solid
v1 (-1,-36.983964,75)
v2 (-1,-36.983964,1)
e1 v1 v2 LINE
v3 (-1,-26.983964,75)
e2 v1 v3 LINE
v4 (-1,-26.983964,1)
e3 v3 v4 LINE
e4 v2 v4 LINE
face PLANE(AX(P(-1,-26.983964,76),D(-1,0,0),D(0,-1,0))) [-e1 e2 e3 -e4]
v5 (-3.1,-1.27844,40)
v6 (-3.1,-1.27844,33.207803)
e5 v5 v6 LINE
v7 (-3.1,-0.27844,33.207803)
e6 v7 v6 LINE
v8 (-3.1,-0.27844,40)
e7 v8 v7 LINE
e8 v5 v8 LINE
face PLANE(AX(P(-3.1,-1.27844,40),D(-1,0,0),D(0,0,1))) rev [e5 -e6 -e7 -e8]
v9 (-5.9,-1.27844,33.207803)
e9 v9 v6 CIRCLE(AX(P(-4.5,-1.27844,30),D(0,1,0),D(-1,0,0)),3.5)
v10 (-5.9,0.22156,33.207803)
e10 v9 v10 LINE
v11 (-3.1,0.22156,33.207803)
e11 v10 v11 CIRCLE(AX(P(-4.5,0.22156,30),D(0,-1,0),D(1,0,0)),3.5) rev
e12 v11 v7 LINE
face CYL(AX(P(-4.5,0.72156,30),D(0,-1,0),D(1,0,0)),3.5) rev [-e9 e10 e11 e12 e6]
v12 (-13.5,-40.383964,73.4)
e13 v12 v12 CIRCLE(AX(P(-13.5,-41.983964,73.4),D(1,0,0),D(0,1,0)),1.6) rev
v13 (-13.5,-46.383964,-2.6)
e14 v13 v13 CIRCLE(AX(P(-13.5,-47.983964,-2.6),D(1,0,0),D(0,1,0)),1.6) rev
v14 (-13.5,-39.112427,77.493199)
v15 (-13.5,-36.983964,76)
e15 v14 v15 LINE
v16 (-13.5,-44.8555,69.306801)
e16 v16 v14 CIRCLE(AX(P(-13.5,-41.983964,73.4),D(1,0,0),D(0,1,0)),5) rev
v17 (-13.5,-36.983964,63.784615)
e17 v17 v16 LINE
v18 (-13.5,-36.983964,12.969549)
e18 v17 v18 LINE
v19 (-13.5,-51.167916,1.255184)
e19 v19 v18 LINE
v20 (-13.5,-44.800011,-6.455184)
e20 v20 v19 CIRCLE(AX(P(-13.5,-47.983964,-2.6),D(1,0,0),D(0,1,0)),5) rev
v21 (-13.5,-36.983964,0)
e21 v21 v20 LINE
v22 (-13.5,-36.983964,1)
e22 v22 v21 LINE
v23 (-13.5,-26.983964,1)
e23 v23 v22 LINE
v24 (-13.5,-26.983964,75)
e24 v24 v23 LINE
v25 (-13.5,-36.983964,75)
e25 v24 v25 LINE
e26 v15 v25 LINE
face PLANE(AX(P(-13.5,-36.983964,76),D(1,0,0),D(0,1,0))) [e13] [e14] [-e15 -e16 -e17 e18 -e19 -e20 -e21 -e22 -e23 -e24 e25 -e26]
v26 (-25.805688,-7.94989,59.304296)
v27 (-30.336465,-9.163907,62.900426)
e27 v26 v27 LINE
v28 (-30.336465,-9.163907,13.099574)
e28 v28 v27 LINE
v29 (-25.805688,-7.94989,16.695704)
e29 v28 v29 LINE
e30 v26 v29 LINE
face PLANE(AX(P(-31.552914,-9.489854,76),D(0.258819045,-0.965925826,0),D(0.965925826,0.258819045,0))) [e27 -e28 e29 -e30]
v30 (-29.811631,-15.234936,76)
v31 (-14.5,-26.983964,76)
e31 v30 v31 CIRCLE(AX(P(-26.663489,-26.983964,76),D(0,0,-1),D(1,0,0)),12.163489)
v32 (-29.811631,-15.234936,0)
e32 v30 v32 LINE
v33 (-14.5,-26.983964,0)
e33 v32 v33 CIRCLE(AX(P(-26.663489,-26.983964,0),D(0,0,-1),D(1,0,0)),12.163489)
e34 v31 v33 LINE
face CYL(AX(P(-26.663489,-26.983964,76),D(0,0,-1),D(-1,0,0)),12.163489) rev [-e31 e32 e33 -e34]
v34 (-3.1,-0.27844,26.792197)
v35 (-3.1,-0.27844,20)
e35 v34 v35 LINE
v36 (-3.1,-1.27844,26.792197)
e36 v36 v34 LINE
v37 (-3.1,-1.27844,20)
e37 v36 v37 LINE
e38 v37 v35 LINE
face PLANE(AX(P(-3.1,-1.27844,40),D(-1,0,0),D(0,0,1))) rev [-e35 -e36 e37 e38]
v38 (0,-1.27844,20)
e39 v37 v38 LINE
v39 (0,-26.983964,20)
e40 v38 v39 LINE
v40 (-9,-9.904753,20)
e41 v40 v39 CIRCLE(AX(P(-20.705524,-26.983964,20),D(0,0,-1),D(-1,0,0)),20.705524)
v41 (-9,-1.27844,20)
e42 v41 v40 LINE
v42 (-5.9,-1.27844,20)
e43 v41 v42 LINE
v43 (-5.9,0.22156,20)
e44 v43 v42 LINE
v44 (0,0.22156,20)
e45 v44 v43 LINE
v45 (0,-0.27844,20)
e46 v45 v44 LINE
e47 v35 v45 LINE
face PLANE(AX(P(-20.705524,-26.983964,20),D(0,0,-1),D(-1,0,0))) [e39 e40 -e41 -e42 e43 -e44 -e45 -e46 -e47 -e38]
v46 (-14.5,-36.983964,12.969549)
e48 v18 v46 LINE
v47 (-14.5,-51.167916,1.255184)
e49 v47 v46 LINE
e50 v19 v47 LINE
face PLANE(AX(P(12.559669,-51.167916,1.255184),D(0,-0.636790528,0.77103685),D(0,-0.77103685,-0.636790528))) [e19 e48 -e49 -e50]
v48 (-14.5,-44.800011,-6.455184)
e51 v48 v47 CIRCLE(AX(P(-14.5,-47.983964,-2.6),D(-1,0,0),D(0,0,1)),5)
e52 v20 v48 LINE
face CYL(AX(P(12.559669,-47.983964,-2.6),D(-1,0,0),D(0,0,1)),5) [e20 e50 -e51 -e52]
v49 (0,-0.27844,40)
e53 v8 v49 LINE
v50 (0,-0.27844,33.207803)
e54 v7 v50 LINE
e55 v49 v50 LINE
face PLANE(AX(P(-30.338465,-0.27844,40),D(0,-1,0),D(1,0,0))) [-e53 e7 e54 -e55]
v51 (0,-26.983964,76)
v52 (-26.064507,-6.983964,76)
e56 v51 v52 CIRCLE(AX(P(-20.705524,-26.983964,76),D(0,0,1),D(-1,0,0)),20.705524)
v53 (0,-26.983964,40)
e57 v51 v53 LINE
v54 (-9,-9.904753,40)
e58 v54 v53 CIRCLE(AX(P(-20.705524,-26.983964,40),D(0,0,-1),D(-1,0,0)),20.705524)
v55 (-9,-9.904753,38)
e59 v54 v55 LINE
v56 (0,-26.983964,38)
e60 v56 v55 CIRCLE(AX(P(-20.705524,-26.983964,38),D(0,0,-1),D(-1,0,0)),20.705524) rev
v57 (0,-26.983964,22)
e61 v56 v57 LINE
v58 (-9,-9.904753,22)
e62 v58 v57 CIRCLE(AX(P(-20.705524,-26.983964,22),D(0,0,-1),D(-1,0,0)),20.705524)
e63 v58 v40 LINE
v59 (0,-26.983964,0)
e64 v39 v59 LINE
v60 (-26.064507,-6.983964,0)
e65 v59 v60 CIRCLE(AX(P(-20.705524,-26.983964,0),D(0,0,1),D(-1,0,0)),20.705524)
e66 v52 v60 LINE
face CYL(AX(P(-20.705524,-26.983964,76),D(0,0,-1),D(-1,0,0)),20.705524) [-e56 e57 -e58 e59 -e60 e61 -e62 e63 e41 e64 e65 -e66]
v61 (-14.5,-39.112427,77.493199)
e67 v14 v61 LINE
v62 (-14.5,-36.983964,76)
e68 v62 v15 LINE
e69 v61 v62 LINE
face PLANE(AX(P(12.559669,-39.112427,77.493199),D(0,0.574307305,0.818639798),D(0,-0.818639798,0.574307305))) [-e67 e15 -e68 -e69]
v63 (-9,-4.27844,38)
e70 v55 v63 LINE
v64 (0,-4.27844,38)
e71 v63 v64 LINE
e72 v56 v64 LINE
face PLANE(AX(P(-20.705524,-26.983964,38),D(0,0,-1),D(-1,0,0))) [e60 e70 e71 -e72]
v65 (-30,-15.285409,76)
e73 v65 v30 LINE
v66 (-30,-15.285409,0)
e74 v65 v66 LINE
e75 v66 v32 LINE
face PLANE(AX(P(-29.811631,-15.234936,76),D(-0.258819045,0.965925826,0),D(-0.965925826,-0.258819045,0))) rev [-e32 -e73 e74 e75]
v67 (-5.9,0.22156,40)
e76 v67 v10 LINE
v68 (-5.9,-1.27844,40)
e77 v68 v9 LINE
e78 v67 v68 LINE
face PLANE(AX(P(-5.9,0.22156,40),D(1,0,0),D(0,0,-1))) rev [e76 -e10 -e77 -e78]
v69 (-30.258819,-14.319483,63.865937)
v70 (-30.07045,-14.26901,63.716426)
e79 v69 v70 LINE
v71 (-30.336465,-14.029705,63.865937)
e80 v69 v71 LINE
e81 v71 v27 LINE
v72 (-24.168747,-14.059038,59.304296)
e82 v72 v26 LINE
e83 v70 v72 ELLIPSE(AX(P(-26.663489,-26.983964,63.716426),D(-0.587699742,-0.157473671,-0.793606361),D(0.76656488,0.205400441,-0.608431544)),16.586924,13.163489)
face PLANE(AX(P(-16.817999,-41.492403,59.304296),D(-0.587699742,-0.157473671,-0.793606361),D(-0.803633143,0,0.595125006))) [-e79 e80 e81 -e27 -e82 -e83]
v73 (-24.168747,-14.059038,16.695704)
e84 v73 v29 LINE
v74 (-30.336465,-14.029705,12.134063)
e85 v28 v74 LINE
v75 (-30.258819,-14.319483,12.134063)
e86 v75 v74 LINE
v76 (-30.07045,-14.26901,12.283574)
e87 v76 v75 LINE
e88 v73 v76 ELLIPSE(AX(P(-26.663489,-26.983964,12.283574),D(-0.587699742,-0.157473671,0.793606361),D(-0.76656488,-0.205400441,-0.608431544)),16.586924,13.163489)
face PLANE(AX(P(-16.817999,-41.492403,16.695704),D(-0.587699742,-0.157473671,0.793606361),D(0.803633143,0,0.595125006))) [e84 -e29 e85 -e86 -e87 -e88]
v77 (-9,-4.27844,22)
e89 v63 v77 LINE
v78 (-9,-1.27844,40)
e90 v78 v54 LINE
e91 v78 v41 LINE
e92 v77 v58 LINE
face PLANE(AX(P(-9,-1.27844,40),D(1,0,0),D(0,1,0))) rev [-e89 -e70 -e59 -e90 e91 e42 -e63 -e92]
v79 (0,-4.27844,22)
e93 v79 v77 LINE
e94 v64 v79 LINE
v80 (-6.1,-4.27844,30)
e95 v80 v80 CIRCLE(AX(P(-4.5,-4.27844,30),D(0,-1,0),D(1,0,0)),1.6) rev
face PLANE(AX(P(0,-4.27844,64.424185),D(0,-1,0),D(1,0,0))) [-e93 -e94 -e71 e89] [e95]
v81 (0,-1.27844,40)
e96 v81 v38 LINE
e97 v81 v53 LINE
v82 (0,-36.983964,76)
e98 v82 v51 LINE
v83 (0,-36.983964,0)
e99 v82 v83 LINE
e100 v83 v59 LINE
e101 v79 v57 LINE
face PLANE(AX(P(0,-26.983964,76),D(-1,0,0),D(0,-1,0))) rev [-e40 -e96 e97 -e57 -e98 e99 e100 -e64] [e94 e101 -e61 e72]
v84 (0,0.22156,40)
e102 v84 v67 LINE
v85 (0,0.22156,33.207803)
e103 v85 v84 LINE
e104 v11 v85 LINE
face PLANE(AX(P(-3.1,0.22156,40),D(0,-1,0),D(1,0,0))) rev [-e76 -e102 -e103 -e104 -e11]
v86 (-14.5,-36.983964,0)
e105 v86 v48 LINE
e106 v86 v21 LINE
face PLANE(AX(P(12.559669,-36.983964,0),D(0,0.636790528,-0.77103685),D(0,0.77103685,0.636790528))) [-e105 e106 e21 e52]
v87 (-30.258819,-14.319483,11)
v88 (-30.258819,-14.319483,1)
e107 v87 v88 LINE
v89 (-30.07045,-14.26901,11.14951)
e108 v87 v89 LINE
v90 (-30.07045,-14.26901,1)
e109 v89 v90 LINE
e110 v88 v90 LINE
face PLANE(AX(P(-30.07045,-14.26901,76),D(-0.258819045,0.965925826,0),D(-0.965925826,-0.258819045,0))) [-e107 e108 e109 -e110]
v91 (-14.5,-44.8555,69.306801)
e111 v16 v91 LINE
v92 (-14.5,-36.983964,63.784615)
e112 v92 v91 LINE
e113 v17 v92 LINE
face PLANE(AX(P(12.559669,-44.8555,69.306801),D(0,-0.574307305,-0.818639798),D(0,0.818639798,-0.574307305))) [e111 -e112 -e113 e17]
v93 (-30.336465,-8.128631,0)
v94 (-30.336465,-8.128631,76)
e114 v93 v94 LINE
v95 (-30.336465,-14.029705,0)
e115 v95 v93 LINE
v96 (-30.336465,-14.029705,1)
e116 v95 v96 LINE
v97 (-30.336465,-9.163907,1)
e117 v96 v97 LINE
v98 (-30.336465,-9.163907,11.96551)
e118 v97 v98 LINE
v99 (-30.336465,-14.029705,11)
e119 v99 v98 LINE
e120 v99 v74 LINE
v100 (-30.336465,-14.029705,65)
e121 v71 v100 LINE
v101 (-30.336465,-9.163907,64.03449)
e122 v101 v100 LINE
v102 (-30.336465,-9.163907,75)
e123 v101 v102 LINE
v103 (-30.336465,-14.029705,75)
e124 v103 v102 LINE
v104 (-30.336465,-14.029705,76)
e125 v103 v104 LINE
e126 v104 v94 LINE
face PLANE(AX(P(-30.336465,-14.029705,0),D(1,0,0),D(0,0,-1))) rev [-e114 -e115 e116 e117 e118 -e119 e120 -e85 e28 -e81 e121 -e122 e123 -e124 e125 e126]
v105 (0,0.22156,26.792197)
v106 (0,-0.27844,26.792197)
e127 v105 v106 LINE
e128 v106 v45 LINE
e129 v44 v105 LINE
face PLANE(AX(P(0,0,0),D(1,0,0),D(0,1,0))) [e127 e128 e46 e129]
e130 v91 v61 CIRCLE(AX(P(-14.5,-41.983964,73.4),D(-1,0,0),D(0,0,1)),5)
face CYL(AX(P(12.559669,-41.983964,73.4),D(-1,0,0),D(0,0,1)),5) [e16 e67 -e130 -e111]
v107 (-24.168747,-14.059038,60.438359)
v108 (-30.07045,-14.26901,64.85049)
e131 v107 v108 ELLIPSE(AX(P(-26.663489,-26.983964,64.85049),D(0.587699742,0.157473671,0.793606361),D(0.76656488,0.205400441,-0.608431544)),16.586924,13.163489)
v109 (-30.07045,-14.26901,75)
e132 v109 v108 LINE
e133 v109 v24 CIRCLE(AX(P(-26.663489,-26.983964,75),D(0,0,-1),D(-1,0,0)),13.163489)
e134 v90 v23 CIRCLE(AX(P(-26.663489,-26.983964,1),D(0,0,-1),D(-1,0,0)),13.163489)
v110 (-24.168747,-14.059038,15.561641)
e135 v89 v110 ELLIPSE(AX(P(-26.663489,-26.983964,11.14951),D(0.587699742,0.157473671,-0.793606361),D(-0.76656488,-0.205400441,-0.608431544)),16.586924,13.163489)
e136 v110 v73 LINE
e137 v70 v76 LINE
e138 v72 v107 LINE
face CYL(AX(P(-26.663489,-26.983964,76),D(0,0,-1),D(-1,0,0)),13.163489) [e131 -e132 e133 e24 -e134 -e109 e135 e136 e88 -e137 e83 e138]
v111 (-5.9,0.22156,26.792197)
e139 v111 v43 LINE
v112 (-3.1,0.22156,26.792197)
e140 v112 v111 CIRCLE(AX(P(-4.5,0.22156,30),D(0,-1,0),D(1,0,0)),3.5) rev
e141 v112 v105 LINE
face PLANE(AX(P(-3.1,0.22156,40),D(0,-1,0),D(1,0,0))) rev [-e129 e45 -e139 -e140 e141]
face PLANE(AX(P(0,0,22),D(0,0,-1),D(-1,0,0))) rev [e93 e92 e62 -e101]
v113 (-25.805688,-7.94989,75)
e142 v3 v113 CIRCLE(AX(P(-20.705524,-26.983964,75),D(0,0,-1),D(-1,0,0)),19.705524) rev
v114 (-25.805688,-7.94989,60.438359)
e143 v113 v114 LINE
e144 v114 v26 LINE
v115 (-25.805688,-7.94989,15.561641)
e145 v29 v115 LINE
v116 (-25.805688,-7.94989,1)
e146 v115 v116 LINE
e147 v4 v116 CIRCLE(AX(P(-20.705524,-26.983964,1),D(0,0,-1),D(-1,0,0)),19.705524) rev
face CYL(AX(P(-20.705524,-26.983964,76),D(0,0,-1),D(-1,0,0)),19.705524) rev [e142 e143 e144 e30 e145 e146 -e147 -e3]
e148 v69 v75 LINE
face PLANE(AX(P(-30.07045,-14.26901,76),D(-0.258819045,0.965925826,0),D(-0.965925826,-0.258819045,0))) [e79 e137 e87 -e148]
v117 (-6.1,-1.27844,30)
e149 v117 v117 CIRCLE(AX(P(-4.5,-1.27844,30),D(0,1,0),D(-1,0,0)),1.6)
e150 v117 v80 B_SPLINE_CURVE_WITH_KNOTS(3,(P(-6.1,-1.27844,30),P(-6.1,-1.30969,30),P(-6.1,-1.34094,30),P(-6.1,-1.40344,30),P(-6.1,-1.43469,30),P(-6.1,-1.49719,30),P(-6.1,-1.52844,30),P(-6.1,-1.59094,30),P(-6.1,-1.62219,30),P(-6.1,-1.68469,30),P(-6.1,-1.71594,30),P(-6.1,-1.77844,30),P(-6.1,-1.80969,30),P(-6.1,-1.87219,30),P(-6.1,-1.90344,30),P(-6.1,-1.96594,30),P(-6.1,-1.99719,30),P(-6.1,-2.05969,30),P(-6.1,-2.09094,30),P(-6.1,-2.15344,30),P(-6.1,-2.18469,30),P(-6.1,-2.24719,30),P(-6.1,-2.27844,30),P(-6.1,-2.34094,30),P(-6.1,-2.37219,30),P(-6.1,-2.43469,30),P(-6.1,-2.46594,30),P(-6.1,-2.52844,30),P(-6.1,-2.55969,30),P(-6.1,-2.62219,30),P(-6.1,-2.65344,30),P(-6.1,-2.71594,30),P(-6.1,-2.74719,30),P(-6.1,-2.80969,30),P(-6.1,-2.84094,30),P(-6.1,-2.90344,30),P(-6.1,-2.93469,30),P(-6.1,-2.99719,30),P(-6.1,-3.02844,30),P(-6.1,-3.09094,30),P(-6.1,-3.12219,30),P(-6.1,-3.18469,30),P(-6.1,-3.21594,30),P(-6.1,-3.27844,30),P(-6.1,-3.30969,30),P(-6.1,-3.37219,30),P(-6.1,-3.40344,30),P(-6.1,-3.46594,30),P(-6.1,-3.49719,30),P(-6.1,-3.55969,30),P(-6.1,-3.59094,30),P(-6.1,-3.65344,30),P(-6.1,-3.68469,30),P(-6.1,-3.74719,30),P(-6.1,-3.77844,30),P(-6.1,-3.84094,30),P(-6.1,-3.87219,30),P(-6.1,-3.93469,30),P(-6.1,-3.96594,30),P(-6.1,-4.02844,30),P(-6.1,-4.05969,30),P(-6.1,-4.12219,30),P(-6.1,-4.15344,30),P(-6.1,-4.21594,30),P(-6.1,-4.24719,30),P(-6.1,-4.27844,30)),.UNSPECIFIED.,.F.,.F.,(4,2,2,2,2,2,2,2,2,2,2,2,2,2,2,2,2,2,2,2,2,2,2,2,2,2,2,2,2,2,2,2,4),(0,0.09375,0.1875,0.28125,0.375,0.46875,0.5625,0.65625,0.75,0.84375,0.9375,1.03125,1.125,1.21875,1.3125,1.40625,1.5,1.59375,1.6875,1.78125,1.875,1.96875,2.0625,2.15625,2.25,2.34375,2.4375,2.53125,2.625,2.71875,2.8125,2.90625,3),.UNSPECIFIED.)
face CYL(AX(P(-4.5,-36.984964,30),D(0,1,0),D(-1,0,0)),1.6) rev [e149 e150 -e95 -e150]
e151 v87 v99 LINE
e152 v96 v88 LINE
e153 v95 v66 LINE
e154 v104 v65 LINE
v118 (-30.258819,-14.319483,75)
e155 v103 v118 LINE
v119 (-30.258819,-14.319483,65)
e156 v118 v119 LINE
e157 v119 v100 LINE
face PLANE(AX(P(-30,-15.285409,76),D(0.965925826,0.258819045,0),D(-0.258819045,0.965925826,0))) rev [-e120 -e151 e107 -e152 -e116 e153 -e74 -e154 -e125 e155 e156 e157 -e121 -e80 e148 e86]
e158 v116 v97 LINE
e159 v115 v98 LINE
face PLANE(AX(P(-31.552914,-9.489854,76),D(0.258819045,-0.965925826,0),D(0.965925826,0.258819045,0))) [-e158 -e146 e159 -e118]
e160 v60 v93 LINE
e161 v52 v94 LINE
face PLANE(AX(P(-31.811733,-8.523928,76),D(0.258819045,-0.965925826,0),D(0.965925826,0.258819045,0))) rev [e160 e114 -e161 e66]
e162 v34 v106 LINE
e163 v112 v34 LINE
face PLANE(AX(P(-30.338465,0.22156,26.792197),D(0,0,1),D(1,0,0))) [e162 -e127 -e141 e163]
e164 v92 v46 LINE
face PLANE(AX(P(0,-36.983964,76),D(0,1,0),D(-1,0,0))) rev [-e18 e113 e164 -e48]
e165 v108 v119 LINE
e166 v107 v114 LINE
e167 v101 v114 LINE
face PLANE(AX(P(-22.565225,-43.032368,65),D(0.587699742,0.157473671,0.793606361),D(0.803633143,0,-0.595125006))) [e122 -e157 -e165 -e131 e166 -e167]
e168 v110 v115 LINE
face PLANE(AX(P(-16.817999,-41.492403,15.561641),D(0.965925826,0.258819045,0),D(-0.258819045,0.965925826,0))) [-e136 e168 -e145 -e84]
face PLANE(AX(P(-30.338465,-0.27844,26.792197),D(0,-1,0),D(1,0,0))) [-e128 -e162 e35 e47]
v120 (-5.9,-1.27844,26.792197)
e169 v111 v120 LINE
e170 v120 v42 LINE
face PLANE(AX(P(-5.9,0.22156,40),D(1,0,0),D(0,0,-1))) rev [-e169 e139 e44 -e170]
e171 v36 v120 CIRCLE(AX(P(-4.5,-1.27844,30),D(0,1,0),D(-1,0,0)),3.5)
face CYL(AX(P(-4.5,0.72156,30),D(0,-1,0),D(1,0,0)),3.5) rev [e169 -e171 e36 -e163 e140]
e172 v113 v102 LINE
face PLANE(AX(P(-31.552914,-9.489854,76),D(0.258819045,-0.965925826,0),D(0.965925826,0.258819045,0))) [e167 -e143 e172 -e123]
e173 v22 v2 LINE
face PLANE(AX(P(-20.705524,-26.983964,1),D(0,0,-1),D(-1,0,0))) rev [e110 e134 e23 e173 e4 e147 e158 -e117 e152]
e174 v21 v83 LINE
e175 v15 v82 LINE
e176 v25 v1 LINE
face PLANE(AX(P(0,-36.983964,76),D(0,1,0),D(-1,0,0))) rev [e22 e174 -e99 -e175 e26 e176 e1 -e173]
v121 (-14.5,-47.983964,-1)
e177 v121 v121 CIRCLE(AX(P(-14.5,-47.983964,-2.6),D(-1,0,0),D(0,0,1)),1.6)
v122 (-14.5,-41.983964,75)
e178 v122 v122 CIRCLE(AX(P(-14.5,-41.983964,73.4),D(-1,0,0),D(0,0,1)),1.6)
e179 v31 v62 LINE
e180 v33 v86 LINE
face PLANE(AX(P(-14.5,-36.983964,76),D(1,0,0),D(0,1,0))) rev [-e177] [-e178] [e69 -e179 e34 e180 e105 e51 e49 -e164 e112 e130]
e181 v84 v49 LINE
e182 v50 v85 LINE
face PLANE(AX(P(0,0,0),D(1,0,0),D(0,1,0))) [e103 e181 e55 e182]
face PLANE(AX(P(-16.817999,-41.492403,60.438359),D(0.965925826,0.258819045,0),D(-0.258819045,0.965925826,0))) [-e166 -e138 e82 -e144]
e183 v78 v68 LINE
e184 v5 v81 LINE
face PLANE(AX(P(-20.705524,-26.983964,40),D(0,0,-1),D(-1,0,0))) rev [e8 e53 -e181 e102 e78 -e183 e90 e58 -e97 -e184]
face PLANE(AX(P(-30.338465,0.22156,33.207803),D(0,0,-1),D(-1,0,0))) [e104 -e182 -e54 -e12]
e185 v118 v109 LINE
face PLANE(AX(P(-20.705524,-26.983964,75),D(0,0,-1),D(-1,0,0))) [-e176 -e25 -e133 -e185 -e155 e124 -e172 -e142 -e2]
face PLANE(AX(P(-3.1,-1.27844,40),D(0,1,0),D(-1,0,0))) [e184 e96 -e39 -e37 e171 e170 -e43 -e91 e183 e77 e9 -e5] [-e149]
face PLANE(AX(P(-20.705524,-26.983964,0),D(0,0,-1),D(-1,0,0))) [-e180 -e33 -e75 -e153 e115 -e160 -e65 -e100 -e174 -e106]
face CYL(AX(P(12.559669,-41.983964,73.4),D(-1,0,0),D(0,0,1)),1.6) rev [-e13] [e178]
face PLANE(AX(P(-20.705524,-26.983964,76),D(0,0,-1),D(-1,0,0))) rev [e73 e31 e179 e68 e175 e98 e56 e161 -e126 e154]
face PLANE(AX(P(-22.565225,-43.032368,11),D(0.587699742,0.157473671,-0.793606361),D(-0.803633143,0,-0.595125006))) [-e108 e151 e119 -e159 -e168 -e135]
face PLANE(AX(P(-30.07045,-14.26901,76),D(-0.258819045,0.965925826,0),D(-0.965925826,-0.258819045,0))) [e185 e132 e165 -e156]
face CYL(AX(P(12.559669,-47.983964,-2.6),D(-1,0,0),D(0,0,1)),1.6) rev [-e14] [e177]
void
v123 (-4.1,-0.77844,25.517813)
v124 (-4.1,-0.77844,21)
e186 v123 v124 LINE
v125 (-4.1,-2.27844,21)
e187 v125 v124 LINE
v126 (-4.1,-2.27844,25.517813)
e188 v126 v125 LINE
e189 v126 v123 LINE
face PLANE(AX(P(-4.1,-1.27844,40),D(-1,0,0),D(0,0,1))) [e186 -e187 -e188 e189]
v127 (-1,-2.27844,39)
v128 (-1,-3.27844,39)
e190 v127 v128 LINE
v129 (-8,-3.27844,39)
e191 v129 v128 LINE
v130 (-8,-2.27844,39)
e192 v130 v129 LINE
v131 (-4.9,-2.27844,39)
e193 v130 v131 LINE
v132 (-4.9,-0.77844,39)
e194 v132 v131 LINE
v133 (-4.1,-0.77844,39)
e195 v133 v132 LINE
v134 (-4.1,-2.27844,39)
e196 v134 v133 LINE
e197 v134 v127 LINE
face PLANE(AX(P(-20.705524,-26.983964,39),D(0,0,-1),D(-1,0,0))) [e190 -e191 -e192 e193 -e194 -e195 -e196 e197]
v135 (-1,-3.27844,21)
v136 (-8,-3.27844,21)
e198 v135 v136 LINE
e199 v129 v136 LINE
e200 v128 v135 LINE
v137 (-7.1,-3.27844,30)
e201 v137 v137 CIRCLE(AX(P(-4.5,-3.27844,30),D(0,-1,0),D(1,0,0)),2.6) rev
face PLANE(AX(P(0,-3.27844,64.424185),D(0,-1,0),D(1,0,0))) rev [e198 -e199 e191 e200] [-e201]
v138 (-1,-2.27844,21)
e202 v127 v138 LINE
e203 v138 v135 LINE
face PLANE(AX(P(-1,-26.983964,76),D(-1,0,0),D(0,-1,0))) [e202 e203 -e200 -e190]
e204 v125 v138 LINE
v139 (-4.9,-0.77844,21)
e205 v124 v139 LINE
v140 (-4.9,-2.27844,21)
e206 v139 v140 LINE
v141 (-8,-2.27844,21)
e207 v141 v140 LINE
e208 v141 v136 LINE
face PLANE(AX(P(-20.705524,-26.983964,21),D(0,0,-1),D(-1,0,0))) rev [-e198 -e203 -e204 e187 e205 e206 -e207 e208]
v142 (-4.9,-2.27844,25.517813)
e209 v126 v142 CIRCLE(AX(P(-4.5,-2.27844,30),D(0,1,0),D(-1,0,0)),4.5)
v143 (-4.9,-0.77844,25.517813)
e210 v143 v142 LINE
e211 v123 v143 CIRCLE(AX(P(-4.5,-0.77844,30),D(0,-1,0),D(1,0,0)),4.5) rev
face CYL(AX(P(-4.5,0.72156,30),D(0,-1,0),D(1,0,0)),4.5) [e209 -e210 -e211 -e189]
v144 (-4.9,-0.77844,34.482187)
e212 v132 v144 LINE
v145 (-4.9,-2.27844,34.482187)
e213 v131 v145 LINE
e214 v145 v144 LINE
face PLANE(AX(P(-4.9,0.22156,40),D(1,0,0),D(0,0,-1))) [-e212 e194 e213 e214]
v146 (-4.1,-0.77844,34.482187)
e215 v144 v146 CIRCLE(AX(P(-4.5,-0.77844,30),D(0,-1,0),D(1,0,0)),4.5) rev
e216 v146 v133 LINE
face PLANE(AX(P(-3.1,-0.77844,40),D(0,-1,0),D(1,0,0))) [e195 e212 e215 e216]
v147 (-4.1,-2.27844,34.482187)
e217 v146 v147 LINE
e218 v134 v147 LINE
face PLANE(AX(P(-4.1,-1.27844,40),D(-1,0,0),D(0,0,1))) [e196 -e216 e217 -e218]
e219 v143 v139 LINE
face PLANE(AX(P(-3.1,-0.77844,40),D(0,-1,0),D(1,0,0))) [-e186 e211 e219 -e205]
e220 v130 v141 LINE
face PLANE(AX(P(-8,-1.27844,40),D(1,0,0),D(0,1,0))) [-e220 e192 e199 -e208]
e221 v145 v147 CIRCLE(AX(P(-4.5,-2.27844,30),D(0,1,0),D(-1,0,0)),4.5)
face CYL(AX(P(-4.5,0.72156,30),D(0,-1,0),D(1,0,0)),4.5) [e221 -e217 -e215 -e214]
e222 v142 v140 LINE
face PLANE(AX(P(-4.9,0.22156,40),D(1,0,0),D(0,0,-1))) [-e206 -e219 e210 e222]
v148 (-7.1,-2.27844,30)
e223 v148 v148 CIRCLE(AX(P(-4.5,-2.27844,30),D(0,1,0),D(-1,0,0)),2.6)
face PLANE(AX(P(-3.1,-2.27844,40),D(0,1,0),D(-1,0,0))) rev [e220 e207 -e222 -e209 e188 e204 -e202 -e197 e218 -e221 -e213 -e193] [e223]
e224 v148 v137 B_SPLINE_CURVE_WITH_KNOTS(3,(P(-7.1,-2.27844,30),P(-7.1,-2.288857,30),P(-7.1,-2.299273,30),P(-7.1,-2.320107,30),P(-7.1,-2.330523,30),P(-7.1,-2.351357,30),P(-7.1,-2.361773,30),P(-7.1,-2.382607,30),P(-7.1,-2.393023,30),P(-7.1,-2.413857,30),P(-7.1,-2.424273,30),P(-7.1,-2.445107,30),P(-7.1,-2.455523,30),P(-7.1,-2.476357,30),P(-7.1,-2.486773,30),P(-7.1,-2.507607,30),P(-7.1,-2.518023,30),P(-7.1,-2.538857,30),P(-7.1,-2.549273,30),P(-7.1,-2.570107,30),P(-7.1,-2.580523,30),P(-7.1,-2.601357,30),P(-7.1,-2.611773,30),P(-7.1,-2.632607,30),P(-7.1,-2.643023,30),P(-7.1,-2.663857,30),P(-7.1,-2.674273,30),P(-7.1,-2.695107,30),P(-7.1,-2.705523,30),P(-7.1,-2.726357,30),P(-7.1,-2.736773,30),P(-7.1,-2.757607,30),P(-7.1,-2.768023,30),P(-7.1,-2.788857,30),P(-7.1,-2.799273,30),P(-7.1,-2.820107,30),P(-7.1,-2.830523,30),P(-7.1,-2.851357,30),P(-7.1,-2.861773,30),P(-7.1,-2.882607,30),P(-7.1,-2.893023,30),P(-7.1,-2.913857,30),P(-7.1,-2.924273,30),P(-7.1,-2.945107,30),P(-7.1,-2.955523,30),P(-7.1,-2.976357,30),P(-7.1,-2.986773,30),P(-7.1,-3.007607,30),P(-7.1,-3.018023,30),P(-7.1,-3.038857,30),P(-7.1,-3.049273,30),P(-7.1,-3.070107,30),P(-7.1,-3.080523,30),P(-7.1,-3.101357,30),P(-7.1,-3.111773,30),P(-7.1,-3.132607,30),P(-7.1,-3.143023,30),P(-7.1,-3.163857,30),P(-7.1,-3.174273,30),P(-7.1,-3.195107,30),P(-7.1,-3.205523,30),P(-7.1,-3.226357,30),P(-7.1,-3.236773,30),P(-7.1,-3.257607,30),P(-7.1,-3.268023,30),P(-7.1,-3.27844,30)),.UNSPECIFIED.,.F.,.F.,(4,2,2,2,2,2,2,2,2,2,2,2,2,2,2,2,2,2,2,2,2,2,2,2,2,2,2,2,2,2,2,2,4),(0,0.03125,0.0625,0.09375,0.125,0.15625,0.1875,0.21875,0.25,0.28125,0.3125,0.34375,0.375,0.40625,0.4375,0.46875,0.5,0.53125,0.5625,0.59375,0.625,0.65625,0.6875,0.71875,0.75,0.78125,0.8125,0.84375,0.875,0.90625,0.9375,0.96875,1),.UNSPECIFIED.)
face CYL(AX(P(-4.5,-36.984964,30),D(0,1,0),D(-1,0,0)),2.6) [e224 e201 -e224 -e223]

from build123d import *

# Parameters (mm, degrees)
RESSALTO_EXTRUS_O1_DEPTH          = 76
CORTE_EXTRUS_O2_DEPTH             = 91.309467661
RESSALTO_EXTRUS_O4_START          = -20
RESSALTO_EXTRUS_O4_DEPTH          = 20
CORTE_EXTRUS_O6_START             = -22
CORTE_EXTRUS_O6_DEPTH             = 16
ESBO_O12_R                        = 3.5
ESBO_O12_R_2                      = 1.6
CORTE_EXTRUS_O7_DEPTH             = 2
ESBO_O12_2_R                      = 1.6
CORTE_EXTRUS_O8_DEPTH             = 90.2814959
CORTE_EXTRUS_O8_DIRECTION_2_REACH = 91.281
RESSALTO_EXTRUS_O5_REACH          = 91.8
ESBO_O14_W                        = 6.792197014
ESBO_O14_H                        = 0.5
CASCA1_START                      = 1
CASCA1_DEPTH                      = 74
CASCA1_START_2                    = -3.278440116
CASCA1_2_OUTLINE_W                = 7
CASCA1_2_OUTLINE_H                = 18
CASCA1_2_OUTLINE_R                = 2.6
CASCA1_2_DEPTH                    = 1
CASCA1_START_3                    = -2.278440116
CASCA1_3_DEPTH                    = 1.5
RESSALTO_EXTRUS_O6_REACH          = 91.8
CORTE_EXTRUS_O9_DEPTH             = 91.309467661
CORTE_EXTRUS_O9_DEPTH_BACK        = 91.309467661
ESBO_O17_R                        = 1.6
RESSALTO_EXTRUS_O7_DEPTH          = 1


# Read off the part's stored shape, not the designer's step: Casca1
with BuildPart() as part:
    # Esboço1 → Ressalto-extrusão1 (new body)
    with BuildSketch(Plane.XY):
        with BuildLine():
            Line((-31.811733316, -8.523928252), (-26.064507457, -6.983963724))
            ThreePointArc((-26.064507457, -6.983963724), (-8.100799468, -10.557167407), (0, -26.983963724))
            Line((0, -26.983963724), (0, -36.983963724))
            Line((0, -36.983963724), (-14.5, -36.983963724))
            Line((-14.5, -36.983963724), (-14.5, -26.983963724))
            ThreePointArc((-14.5, -26.983963724), (-19.25882596, -17.334019289), (-29.811631303, -15.234935796))
            Line((-29.811631303, -15.234935796), (-30, -15.285409036))
            Line((-30, -15.285409036), (-31.811733316, -8.523928252))
        make_face()
    extrude(amount=RESSALTO_EXTRUS_O1_DEPTH)

    # Esboço3 → Corte-extrusão2 (cut, through all)
    with BuildSketch(Plane.XY.offset(76)):
        Polygon((-30.336464759, -14.029705462), (-30.336464759, -8.128631233), (-31.811733316, -8.523928252), align=None)
    extrude(amount=-CORTE_EXTRUS_O2_DEPTH, mode=Mode.SUBTRACT)

    # Esboço8 → Ressalto-extrusão4 (add)
    with BuildSketch(Plane(origin=(0, 0, 0), x_dir=(-1, 0, 0), z_dir=(0, 0, -1)).offset(RESSALTO_EXTRUS_O4_START)):
        with BuildLine():
            Line((9, -1.278440116), (5.9, -1.278440116))
            Line((5.9, -1.278440116), (5.9, 0.221559884))
            Line((5.9, 0.221559884), (3.1, 0.221559884))
            Line((3.1, 0.221559884), (3.1, -1.278440116))
            Line((3.1, -1.278440116), (0, -1.278440116))
            Line((0, -1.278440116), (0, -26.983963724))
            ThreePointArc((0, -26.983963724), (2.38766752, -17.331251347), (9, -9.90475341))
            Line((9, -9.90475341), (9, -1.278440116))
        make_face()
    extrude(amount=-RESSALTO_EXTRUS_O4_DEPTH)

    # Esboço8<3> → Corte-extrusão6 (cut)
    with BuildSketch(Plane(origin=(0, 0, 0), x_dir=(-1, 0, 0), z_dir=(0, 0, -1)).offset(CORTE_EXTRUS_O6_START)):
        with BuildLine():
            Line((9, -9.90475341), (9, -4.278440116))
            Line((9, -4.278440116), (0, -4.278440116))
            Line((0, -4.278440116), (0, -26.983963724))
            ThreePointArc((0, -26.983963724), (2.38766752, -17.331251347), (9, -9.90475341))
        make_face()
    extrude(amount=-CORTE_EXTRUS_O6_DEPTH, mode=Mode.SUBTRACT)

    # Esboço12 → Corte-extrusão7 (cut)
    with BuildSketch(Plane(origin=(0, -1.278440116, 0), x_dir=(1, 0, 0), z_dir=(0, 1, 0))):
        with Locations((-4.5, -30)):
            Circle(ESBO_O12_R)
        with Locations((-4.5, -30)):
            Circle(ESBO_O12_R_2, mode=Mode.SUBTRACT)
    extrude(amount=CORTE_EXTRUS_O7_DEPTH, mode=Mode.SUBTRACT)

    # Esboço12<2> → Corte-extrusão8 (cut)
    with BuildSketch(Plane(origin=(0, -1.278440116, 0), x_dir=(1, 0, 0), z_dir=(0, 1, 0))):
        with Locations(Location((-4.5, -30, 0), (0, 0, 180))):
            Circle(ESBO_O12_2_R)
    extrude(amount=CORTE_EXTRUS_O8_DEPTH, mode=Mode.SUBTRACT)

    # Esboço12<2> → Corte-extrusão8 direction 2 (cut, up to next)
    with BuildSketch(Plane(origin=(0, -1.278440116, 0), x_dir=(1, 0, 0), z_dir=(0, 1, 0)), mode=Mode.PRIVATE) as corte_extrus_o8_direction_2_sk1:
        with Locations(Location((-4.5, -30, 0), (0, 0, 180))):
            Circle(ESBO_O12_2_R)
    corte_extrus_o8_direction_2_tool1 = extrude(corte_extrus_o8_direction_2_sk1.sketch, amount=-CORTE_EXTRUS_O8_DIRECTION_2_REACH, mode=Mode.PRIVATE) & part.part
    add(corte_extrus_o8_direction_2_tool1.solids().sort_by_distance((-4.5, -1.27844, 30))[0], mode=Mode.SUBTRACT)

    # Esboço14 → Ressalto-extrusão5 (add, up to next)
    with BuildSketch(Plane(origin=(0, 0, 0), x_dir=(0, 0, -1), z_dir=(1, 0, 0)), mode=Mode.PRIVATE) as ressalto_extrus_o5_sk1:
        with Locations((-36.603901493, -0.028440116)):
            Rectangle(ESBO_O14_W, ESBO_O14_H)
    ressalto_extrus_o5_tool1 = extrude(ressalto_extrus_o5_sk1.sketch, amount=-RESSALTO_EXTRUS_O5_REACH, mode=Mode.PRIVATE) - part.part
    # Esboço14 → Ressalto-extrusão5 (add, up to next)
    with BuildSketch(Plane(origin=(0, 0, 0), x_dir=(0, 0, -1), z_dir=(1, 0, 0)), mode=Mode.PRIVATE) as ressalto_extrus_o5_sk2:
        with Locations((-23.396098507, -0.028440116)):
            Rectangle(ESBO_O14_W, ESBO_O14_H)
    ressalto_extrus_o5_tool2 = extrude(ressalto_extrus_o5_sk2.sketch, amount=-RESSALTO_EXTRUS_O5_REACH, mode=Mode.PRIVATE) - part.part
    add(ressalto_extrus_o5_tool1.solids().sort_by_distance((0, -0.02844, 36.603901))[0])
    add(ressalto_extrus_o5_tool2.solids().sort_by_distance((0, -0.02844, 23.396099))[0])

    # Casca1 outline → Casca1 (cut)
    with BuildSketch(Plane.XY.offset(CASCA1_START)):
        with BuildLine():
            Line((-25.805688412, -7.94988955), (-30.336464759, -9.163907414))
            Line((-30.336464759, -9.163907414), (-30.336464759, -14.029705462))
            Line((-30.336464759, -14.029705462), (-30.258819045, -14.31948321))
            Line((-30.258819045, -14.31948321), (-30.070450348, -14.269009969))
            ThreePointArc((-30.070450348, -14.269009969), (-18.650064531, -16.540665949), (-13.5, -26.983963724))
            Line((-13.5, -26.983963724), (-13.5, -36.983963724))
            Line((-13.5, -36.983963724), (-1, -36.983963724))
            Line((-1, -36.983963724), (-1, -26.983963724))
            ThreePointArc((-1, -26.983963724), (-8.709560897, -11.350520747), (-25.805688412, -7.94988955))
        make_face()
    extrude(amount=CASCA1_DEPTH, mode=Mode.SUBTRACT)

    # Casca1 2 outline → Casca1 2 (cut)
    with BuildSketch(Plane(origin=(0, 0, 0), x_dir=(1, 0, 0), z_dir=(0, 1, 0)).offset(CASCA1_START_2)):
        with Locations((-4.5, -30)):
            Rectangle(CASCA1_2_OUTLINE_W, CASCA1_2_OUTLINE_H)
        with Locations((-4.5, -30)):
            Circle(CASCA1_2_OUTLINE_R, mode=Mode.SUBTRACT)
    extrude(amount=CASCA1_2_DEPTH, mode=Mode.SUBTRACT)

    # Casca1 3 outline → Casca1 3 (cut)
    with BuildSketch(Plane(origin=(0, 0, 0), x_dir=(1, 0, 0), z_dir=(0, 1, 0)).offset(CASCA1_START_3)):
        with BuildLine():
            Line((-4.1, -25.517813034), (-4.1, -21))
            Line((-4.1, -21), (-4.9, -21))
            Line((-4.9, -21), (-4.9, -25.517813034))
            ThreePointArc((-4.9, -25.517813034), (-4.5, -25.5), (-4.1, -25.517813034))
        make_face()
        with BuildLine():
            Line((-4.9, -39), (-4.1, -39))
            Line((-4.1, -39), (-4.1, -34.482186966))
            ThreePointArc((-4.1, -34.482186966), (-4.5, -34.5), (-4.9, -34.482186966))
            Line((-4.9, -34.482186966), (-4.9, -39))
        make_face()
    extrude(amount=CASCA1_3_DEPTH, mode=Mode.SUBTRACT)

    # Esboço15 → Ressalto-extrusão6 (add, up to next)
    with BuildSketch(Plane(origin=(0, 0, 0), x_dir=(0.965925826289069, 0.2588190451025183, 0), z_dir=(-0.2588190451025183, 0.965925826289069, 0)), mode=Mode.PRIVATE) as ressalto_extrus_o6_sk1:
        Polygon((-32.933929759, -11), (-26.983963724, -15.561640627), (-26.983963724, -16.695704117), (-32.933929759, -12.13406349), align=None)
    ressalto_extrus_o6_tool1 = extrude(ressalto_extrus_o6_sk1.sketch, amount=-RESSALTO_EXTRUS_O6_REACH, mode=Mode.PRIVATE) - part.part
    # Esboço15 → Ressalto-extrusão6 (add, up to next)
    with BuildSketch(Plane(origin=(0, 0, 0), x_dir=(0.965925826289069, 0.2588190451025183, 0), z_dir=(-0.2588190451025183, 0.965925826289069, 0)), mode=Mode.PRIVATE) as ressalto_extrus_o6_sk2:
        Polygon((-32.933929759, -63.86593651), (-32.933929759, -65), (-26.983963724, -60.438359373), (-26.983963724, -59.304295883), align=None)
    ressalto_extrus_o6_tool2 = extrude(ressalto_extrus_o6_sk2.sketch, amount=-RESSALTO_EXTRUS_O6_REACH, mode=Mode.PRIVATE) - part.part
    add(ressalto_extrus_o6_tool1.solids().sort_by_distance((-28.93812, -7.753946, 13.847852))[0])
    add(ressalto_extrus_o6_tool2.solids().sort_by_distance((-28.93812, -7.753946, 62.152148))[0])

    # Esboço16 → Corte-extrusão9 (cut, two sides: drawn at the far end of the back side and taken through both)
    with BuildSketch(Plane.XY.offset(76).offset(-CORTE_EXTRUS_O9_DEPTH_BACK)):
        Polygon((-31.811733316, -8.523928252), (-30.336464759, -14.029705462), (-30.336464759, -8.128631233), align=None)
    extrude(amount=CORTE_EXTRUS_O9_DEPTH + CORTE_EXTRUS_O9_DEPTH_BACK, mode=Mode.SUBTRACT)

    # Esboço17 → Ressalto-extrusão7 (add)
    # profile 1 of 2: a face of its own
    with BuildSketch(Plane.ZY.offset(14.5)):
        with BuildLine():
            Line((0, -36.983963724), (-6.455184248, -44.800011084))
            ThreePointArc((-6.455184248, -44.800011084), (-5.78395264, -51.839147972), (1.255184248, -51.167916365))
            Line((1.255184248, -51.167916365), (12.969548739, -36.983963724))
            Line((12.969548739, -36.983963724), (0, -36.983963724))
        make_face()
        with Locations((-2.6, -47.983963724)):
            Circle(ESBO_O17_R, mode=Mode.SUBTRACT)
    # profile 2 of 2: a face of its own
    with BuildSketch(Plane.ZY.offset(14.5)):
        with BuildLine():
            Line((77.493198992, -39.1124272), (76, -36.983963724))
            Line((76, -36.983963724), (63.784615385, -36.983963724))
            Line((63.784615385, -36.983963724), (69.306801008, -44.855500248))
            ThreePointArc((69.306801008, -44.855500248), (76.271536524, -46.077162717), (77.493198992, -39.1124272))
        make_face()
        with Locations((73.4, -41.983963724)):
            Circle(ESBO_O17_R, mode=Mode.SUBTRACT)
    extrude(amount=-RESSALTO_EXTRUS_O7_DEPTH)


solid = part.part
